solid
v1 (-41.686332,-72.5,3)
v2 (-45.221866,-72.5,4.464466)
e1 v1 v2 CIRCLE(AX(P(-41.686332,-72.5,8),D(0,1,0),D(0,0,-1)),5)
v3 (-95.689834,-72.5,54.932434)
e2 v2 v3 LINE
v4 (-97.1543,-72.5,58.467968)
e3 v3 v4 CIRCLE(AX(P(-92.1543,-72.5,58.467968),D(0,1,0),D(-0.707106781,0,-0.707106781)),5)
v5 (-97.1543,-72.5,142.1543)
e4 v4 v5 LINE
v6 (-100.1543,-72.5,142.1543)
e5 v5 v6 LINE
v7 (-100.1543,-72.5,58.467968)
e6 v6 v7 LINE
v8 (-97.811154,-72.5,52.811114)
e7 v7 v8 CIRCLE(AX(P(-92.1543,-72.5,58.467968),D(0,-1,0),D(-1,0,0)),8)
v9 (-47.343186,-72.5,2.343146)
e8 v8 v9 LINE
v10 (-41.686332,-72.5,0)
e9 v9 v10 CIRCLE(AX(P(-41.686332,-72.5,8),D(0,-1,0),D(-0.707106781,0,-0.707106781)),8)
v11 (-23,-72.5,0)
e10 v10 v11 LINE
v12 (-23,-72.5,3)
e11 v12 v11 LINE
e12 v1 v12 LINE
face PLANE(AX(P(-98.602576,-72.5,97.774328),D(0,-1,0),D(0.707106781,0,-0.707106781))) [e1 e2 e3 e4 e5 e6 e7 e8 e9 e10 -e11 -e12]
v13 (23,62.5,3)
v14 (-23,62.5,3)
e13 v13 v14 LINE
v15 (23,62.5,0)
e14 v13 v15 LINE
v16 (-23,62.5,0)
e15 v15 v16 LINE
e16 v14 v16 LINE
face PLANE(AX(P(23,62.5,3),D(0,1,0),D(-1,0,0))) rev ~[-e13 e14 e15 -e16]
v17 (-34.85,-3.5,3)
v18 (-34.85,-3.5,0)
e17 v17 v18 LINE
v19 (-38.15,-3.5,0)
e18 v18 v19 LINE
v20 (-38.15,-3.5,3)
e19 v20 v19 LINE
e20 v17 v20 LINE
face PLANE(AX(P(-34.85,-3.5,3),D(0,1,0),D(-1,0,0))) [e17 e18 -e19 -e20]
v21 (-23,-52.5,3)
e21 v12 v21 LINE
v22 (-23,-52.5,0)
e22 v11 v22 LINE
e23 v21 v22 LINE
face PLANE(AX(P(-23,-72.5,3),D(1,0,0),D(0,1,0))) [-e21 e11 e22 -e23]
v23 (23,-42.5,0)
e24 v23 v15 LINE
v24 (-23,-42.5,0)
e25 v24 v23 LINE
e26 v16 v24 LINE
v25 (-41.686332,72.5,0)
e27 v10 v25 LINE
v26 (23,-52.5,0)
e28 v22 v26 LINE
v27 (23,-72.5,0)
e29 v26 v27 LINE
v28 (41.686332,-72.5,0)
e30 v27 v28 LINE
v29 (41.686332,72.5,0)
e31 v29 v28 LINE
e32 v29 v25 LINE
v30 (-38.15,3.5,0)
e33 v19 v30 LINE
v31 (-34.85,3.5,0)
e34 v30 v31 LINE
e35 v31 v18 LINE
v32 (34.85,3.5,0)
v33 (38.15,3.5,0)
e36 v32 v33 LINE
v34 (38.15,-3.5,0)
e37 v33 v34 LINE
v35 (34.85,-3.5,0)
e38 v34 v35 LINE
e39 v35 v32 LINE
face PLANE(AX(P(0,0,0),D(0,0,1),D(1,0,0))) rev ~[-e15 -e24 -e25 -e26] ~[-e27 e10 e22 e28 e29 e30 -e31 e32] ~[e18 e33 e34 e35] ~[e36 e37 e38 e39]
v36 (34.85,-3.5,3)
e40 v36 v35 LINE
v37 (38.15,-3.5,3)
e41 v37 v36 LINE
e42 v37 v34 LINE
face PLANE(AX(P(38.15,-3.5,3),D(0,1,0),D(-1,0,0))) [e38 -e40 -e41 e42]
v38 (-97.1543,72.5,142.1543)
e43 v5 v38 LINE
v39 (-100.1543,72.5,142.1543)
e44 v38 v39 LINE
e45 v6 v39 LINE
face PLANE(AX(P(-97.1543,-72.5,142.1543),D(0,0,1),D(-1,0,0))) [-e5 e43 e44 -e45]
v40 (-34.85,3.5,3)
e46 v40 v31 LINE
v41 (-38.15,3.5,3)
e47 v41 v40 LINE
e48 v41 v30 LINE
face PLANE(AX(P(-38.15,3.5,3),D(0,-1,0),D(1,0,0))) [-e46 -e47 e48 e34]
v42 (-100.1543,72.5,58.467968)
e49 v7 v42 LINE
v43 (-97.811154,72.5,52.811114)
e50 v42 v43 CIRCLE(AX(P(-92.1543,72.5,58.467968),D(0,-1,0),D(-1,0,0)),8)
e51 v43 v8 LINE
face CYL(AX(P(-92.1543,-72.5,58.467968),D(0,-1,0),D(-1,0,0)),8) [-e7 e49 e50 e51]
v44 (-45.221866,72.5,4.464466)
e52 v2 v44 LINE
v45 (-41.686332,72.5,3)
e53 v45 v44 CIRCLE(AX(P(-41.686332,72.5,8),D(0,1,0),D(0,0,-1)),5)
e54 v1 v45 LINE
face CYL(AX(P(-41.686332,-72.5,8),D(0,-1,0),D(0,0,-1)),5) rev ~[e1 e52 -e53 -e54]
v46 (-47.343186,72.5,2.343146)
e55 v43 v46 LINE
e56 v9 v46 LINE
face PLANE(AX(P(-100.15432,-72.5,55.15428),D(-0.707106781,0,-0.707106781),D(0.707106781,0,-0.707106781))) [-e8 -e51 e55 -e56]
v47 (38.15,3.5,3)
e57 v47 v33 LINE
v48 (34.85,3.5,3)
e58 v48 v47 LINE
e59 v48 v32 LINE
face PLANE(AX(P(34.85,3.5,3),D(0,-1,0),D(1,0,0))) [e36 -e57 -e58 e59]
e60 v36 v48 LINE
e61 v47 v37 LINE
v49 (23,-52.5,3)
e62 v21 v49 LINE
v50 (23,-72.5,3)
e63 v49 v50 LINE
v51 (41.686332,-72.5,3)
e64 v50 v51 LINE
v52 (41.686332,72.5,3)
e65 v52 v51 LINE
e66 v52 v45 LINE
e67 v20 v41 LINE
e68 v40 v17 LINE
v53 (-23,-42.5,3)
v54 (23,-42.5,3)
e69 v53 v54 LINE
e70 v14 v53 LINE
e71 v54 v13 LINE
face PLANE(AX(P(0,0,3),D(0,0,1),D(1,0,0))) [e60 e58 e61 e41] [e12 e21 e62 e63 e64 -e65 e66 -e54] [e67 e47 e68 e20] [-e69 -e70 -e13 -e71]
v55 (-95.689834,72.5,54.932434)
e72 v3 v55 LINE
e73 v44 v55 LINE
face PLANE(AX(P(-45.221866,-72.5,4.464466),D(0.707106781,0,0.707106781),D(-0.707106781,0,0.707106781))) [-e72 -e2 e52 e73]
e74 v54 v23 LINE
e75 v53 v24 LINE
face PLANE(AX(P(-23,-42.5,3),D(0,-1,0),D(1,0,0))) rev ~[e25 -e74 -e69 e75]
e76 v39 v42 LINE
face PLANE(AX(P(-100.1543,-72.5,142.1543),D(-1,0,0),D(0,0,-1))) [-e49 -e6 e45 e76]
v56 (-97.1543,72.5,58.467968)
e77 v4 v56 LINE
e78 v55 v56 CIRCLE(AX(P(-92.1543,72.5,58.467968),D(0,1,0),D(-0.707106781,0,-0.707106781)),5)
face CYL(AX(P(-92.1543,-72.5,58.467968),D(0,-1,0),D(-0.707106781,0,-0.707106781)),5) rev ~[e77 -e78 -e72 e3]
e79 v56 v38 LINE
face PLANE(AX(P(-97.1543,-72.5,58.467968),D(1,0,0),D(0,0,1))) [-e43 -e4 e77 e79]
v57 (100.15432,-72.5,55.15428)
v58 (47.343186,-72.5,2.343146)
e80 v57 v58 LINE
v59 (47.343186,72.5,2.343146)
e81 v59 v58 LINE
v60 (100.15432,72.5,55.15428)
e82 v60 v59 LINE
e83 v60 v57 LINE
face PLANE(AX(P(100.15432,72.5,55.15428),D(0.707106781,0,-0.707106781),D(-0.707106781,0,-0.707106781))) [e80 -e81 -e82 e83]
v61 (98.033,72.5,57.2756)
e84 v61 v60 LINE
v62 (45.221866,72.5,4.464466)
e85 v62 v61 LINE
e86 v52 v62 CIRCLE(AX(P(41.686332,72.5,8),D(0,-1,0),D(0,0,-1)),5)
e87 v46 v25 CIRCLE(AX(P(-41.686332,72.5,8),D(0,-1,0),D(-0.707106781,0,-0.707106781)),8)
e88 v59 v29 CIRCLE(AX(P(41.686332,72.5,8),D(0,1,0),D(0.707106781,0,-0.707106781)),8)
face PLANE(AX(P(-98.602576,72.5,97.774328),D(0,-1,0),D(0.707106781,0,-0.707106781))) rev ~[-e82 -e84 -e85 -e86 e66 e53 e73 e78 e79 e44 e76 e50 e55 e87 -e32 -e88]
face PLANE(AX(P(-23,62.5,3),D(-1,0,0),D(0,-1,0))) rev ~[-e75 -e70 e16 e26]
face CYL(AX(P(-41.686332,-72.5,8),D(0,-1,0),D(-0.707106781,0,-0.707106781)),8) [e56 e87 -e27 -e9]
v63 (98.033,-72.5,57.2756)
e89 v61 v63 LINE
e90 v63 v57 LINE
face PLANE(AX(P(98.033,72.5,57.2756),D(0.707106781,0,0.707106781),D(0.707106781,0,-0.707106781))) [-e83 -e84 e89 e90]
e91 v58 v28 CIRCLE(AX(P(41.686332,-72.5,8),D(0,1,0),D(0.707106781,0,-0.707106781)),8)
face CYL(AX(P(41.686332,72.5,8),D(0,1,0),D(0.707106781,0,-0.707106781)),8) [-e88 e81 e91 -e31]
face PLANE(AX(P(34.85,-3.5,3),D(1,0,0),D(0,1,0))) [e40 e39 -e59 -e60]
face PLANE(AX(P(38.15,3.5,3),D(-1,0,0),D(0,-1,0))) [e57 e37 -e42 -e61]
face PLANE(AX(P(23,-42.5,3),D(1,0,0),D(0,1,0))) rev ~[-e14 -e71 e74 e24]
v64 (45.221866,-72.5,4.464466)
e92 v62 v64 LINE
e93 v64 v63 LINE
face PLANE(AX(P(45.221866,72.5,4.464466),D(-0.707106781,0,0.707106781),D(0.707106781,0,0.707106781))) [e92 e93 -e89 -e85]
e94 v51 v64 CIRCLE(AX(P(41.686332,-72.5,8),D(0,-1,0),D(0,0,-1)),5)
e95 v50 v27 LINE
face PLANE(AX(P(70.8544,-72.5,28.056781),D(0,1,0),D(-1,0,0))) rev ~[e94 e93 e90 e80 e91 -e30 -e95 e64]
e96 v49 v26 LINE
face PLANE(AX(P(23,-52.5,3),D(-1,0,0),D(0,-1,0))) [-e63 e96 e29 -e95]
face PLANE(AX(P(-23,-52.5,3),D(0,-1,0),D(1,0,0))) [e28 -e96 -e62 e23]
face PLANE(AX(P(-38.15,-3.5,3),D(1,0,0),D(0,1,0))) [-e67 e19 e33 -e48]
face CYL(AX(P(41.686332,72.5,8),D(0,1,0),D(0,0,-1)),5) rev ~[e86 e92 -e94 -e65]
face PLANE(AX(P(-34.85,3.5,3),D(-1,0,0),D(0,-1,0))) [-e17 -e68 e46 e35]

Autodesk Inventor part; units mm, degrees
ref_plane "YZ Plane" through (0, 0, 0) normal (1, 0, 0) x (0, 1, 0)
ref_plane "XZ Plane" through (0, 0, 0) normal (0, 1, 0) x (-1, 0, 0)
ref_plane "XY Plane" through (0, 0, 0) normal (0, 0, 1) x (1, 0, 0)
sketch "Sketch1" plane through (0, 0, 0) normal (0, 0, 1) x (1, 0, 0)
  line L0 (-45, -72.5) -> (45, -72.5)
  line L1 (45, -72.5) -> (45, 72.5)
  line L2 (45, 72.5) -> (-45, 72.5)
  line L3 (-45, 72.5) -> (-45, -72.5)
  line L4 (-45, -72.5) -> (45, 72.5) construction
  line L5 (45, -72.5) -> (-45, 72.5) construction
  point P0 (0, 0)
  dimension "d154" = 90
  dimension "d155" = 145
extrude "Plate3" add sketch "Sketch1" along normal blind 3
sketch "Sketch7" plane through (42.8787, 72.5, 2.1213) normal (0.7071068, 0, -0.7071068) x (0, 1, 0)
  line L0 (-145, 0) -> (0, 0)
  line L1 (0, 0) -> (0, 78)
  line L2 (0, 78) -> (-145, 78)
  line L3 (-145, 78) -> (-145, 0)
edge flange "Flange3" height 78 angle 45 thickness 3 bend radius 5 thickness toward (0.7071068, 0, -0.7071068) relief round relief width 3 relief depth 1.5 corner gap 5 corner form 0 edges at (45, 0, 3) (-45, 0, 3) wall of the first edge with corners at (42.8787, -72.5, 2.1213) (42.8787, 72.5, 2.1213) (98.033, 72.5, 57.2756) (98.033, -72.5, 57.2756)
bend "Bend3"
corner "Corner3"
sketch "Sketch8" plane through (0, 0, 3) normal (0, 0, 1) x (1, 0, 0)
  line L0 (23, 62.5) -> (-23, 62.5)
  line L1 (-23, 62.5) -> (-23, -42.5)
  line L2 (-23, -42.5) -> (23, -42.5)
  line L3 (23, -42.5) -> (23, 62.5)
  line L4 (23, 62.5) -> (-23, -42.5) construction
  line L5 (-23, 62.5) -> (23, -42.5) construction
  line L6 (-45, 72.5) -> (41.6863, 72.5) projected
  line L7 (-41.6863, -72.5) -> (41.6863, -72.5) projected
  line L8 (23, -72.5) -> (-23, -72.5)
  line L9 (-23, -72.5) -> (-23, -52.5)
  line L10 (-23, -52.5) -> (23, -52.5)
  line L11 (23, -52.5) -> (23, -72.5)
  point P0 (0, 0)
  point P1 (0, 10)
  point P2 (-23, -72.5)
  point P3 (33.1873, -84)
  dimension "d166" = 46
  dimension "d168" = 10
  dimension "d182" = 10
  dimension "d183" = 20
extrude "Cut1" cut sketch "Sketch8" against normal blind 3
sketch "Sketch9" plane through (-97.1543, -72.5, 55.1543) normal (-1, 0, 0) x (0, -1, 0)
  line L0 (-145, 0) -> (0, 0)
  line L1 (0, 0) -> (0, 87)
  line L2 (0, 87) -> (-145, 87)
  line L3 (-145, 87) -> (-145, 0)
edge flange "Flange4" height 87 angle 45 thickness 3 bend radius 5 thickness toward (-1, 0, 0) relief round relief width 3 relief depth 1.5 edges at (-98.033, 0, 57.2756) wall of the first edge with corners at (-97.1543, 72.5, 55.1543) (-97.1543, -72.5, 55.1543) (-97.1543, -72.5, 142.1543) (-97.1543, 72.5, 142.1543)
bend "Bend4"
corner "Corner4"
sketch "Sketch10" plane through (0, 0, 3) normal (0, 0, 1) x (1, 0, 0)
  line L0 (-38.15, 3.5) -> (-34.85, 3.5)
  line L1 (-34.85, 3.5) -> (-34.85, -3.5)
  line L2 (-34.85, -3.5) -> (-38.15, -3.5)
  line L3 (-38.15, -3.5) -> (-38.15, 3.5)
  line L4 (-38.15, 3.5) -> (-34.85, -3.5) construction
  line L5 (-34.85, 3.5) -> (-38.15, -3.5) construction
  line L6 (34.85, 3.5) -> (38.15, 3.5)
  line L7 (38.15, 3.5) -> (38.15, -3.5)
  line L8 (38.15, -3.5) -> (34.85, -3.5)
  line L9 (34.85, -3.5) -> (34.85, 3.5)
  line L10 (34.85, 3.5) -> (38.15, -3.5) construction
  line L11 (38.15, 3.5) -> (34.85, -3.5) construction
  line L12 (0, 0) -> (0, 29.0693)
  line L13 (41.6863, -72.5) -> (23, -72.5) projected
  point P0 (-36.5, 0)
  point P1 (36.5, 0)
  point P2 (-36.5, 3.5)
  point P3 (36.5, 3.5)
  dimension "d184" = 7
  dimension "d185" = 3.3
  dimension "d186" = 69
  dimension "d187" = 73
extrude "Cut2" cut sketch "Sketch10" against normal blind 3
properties part number "DSB-101 Axis" material "Stainless Steel"
